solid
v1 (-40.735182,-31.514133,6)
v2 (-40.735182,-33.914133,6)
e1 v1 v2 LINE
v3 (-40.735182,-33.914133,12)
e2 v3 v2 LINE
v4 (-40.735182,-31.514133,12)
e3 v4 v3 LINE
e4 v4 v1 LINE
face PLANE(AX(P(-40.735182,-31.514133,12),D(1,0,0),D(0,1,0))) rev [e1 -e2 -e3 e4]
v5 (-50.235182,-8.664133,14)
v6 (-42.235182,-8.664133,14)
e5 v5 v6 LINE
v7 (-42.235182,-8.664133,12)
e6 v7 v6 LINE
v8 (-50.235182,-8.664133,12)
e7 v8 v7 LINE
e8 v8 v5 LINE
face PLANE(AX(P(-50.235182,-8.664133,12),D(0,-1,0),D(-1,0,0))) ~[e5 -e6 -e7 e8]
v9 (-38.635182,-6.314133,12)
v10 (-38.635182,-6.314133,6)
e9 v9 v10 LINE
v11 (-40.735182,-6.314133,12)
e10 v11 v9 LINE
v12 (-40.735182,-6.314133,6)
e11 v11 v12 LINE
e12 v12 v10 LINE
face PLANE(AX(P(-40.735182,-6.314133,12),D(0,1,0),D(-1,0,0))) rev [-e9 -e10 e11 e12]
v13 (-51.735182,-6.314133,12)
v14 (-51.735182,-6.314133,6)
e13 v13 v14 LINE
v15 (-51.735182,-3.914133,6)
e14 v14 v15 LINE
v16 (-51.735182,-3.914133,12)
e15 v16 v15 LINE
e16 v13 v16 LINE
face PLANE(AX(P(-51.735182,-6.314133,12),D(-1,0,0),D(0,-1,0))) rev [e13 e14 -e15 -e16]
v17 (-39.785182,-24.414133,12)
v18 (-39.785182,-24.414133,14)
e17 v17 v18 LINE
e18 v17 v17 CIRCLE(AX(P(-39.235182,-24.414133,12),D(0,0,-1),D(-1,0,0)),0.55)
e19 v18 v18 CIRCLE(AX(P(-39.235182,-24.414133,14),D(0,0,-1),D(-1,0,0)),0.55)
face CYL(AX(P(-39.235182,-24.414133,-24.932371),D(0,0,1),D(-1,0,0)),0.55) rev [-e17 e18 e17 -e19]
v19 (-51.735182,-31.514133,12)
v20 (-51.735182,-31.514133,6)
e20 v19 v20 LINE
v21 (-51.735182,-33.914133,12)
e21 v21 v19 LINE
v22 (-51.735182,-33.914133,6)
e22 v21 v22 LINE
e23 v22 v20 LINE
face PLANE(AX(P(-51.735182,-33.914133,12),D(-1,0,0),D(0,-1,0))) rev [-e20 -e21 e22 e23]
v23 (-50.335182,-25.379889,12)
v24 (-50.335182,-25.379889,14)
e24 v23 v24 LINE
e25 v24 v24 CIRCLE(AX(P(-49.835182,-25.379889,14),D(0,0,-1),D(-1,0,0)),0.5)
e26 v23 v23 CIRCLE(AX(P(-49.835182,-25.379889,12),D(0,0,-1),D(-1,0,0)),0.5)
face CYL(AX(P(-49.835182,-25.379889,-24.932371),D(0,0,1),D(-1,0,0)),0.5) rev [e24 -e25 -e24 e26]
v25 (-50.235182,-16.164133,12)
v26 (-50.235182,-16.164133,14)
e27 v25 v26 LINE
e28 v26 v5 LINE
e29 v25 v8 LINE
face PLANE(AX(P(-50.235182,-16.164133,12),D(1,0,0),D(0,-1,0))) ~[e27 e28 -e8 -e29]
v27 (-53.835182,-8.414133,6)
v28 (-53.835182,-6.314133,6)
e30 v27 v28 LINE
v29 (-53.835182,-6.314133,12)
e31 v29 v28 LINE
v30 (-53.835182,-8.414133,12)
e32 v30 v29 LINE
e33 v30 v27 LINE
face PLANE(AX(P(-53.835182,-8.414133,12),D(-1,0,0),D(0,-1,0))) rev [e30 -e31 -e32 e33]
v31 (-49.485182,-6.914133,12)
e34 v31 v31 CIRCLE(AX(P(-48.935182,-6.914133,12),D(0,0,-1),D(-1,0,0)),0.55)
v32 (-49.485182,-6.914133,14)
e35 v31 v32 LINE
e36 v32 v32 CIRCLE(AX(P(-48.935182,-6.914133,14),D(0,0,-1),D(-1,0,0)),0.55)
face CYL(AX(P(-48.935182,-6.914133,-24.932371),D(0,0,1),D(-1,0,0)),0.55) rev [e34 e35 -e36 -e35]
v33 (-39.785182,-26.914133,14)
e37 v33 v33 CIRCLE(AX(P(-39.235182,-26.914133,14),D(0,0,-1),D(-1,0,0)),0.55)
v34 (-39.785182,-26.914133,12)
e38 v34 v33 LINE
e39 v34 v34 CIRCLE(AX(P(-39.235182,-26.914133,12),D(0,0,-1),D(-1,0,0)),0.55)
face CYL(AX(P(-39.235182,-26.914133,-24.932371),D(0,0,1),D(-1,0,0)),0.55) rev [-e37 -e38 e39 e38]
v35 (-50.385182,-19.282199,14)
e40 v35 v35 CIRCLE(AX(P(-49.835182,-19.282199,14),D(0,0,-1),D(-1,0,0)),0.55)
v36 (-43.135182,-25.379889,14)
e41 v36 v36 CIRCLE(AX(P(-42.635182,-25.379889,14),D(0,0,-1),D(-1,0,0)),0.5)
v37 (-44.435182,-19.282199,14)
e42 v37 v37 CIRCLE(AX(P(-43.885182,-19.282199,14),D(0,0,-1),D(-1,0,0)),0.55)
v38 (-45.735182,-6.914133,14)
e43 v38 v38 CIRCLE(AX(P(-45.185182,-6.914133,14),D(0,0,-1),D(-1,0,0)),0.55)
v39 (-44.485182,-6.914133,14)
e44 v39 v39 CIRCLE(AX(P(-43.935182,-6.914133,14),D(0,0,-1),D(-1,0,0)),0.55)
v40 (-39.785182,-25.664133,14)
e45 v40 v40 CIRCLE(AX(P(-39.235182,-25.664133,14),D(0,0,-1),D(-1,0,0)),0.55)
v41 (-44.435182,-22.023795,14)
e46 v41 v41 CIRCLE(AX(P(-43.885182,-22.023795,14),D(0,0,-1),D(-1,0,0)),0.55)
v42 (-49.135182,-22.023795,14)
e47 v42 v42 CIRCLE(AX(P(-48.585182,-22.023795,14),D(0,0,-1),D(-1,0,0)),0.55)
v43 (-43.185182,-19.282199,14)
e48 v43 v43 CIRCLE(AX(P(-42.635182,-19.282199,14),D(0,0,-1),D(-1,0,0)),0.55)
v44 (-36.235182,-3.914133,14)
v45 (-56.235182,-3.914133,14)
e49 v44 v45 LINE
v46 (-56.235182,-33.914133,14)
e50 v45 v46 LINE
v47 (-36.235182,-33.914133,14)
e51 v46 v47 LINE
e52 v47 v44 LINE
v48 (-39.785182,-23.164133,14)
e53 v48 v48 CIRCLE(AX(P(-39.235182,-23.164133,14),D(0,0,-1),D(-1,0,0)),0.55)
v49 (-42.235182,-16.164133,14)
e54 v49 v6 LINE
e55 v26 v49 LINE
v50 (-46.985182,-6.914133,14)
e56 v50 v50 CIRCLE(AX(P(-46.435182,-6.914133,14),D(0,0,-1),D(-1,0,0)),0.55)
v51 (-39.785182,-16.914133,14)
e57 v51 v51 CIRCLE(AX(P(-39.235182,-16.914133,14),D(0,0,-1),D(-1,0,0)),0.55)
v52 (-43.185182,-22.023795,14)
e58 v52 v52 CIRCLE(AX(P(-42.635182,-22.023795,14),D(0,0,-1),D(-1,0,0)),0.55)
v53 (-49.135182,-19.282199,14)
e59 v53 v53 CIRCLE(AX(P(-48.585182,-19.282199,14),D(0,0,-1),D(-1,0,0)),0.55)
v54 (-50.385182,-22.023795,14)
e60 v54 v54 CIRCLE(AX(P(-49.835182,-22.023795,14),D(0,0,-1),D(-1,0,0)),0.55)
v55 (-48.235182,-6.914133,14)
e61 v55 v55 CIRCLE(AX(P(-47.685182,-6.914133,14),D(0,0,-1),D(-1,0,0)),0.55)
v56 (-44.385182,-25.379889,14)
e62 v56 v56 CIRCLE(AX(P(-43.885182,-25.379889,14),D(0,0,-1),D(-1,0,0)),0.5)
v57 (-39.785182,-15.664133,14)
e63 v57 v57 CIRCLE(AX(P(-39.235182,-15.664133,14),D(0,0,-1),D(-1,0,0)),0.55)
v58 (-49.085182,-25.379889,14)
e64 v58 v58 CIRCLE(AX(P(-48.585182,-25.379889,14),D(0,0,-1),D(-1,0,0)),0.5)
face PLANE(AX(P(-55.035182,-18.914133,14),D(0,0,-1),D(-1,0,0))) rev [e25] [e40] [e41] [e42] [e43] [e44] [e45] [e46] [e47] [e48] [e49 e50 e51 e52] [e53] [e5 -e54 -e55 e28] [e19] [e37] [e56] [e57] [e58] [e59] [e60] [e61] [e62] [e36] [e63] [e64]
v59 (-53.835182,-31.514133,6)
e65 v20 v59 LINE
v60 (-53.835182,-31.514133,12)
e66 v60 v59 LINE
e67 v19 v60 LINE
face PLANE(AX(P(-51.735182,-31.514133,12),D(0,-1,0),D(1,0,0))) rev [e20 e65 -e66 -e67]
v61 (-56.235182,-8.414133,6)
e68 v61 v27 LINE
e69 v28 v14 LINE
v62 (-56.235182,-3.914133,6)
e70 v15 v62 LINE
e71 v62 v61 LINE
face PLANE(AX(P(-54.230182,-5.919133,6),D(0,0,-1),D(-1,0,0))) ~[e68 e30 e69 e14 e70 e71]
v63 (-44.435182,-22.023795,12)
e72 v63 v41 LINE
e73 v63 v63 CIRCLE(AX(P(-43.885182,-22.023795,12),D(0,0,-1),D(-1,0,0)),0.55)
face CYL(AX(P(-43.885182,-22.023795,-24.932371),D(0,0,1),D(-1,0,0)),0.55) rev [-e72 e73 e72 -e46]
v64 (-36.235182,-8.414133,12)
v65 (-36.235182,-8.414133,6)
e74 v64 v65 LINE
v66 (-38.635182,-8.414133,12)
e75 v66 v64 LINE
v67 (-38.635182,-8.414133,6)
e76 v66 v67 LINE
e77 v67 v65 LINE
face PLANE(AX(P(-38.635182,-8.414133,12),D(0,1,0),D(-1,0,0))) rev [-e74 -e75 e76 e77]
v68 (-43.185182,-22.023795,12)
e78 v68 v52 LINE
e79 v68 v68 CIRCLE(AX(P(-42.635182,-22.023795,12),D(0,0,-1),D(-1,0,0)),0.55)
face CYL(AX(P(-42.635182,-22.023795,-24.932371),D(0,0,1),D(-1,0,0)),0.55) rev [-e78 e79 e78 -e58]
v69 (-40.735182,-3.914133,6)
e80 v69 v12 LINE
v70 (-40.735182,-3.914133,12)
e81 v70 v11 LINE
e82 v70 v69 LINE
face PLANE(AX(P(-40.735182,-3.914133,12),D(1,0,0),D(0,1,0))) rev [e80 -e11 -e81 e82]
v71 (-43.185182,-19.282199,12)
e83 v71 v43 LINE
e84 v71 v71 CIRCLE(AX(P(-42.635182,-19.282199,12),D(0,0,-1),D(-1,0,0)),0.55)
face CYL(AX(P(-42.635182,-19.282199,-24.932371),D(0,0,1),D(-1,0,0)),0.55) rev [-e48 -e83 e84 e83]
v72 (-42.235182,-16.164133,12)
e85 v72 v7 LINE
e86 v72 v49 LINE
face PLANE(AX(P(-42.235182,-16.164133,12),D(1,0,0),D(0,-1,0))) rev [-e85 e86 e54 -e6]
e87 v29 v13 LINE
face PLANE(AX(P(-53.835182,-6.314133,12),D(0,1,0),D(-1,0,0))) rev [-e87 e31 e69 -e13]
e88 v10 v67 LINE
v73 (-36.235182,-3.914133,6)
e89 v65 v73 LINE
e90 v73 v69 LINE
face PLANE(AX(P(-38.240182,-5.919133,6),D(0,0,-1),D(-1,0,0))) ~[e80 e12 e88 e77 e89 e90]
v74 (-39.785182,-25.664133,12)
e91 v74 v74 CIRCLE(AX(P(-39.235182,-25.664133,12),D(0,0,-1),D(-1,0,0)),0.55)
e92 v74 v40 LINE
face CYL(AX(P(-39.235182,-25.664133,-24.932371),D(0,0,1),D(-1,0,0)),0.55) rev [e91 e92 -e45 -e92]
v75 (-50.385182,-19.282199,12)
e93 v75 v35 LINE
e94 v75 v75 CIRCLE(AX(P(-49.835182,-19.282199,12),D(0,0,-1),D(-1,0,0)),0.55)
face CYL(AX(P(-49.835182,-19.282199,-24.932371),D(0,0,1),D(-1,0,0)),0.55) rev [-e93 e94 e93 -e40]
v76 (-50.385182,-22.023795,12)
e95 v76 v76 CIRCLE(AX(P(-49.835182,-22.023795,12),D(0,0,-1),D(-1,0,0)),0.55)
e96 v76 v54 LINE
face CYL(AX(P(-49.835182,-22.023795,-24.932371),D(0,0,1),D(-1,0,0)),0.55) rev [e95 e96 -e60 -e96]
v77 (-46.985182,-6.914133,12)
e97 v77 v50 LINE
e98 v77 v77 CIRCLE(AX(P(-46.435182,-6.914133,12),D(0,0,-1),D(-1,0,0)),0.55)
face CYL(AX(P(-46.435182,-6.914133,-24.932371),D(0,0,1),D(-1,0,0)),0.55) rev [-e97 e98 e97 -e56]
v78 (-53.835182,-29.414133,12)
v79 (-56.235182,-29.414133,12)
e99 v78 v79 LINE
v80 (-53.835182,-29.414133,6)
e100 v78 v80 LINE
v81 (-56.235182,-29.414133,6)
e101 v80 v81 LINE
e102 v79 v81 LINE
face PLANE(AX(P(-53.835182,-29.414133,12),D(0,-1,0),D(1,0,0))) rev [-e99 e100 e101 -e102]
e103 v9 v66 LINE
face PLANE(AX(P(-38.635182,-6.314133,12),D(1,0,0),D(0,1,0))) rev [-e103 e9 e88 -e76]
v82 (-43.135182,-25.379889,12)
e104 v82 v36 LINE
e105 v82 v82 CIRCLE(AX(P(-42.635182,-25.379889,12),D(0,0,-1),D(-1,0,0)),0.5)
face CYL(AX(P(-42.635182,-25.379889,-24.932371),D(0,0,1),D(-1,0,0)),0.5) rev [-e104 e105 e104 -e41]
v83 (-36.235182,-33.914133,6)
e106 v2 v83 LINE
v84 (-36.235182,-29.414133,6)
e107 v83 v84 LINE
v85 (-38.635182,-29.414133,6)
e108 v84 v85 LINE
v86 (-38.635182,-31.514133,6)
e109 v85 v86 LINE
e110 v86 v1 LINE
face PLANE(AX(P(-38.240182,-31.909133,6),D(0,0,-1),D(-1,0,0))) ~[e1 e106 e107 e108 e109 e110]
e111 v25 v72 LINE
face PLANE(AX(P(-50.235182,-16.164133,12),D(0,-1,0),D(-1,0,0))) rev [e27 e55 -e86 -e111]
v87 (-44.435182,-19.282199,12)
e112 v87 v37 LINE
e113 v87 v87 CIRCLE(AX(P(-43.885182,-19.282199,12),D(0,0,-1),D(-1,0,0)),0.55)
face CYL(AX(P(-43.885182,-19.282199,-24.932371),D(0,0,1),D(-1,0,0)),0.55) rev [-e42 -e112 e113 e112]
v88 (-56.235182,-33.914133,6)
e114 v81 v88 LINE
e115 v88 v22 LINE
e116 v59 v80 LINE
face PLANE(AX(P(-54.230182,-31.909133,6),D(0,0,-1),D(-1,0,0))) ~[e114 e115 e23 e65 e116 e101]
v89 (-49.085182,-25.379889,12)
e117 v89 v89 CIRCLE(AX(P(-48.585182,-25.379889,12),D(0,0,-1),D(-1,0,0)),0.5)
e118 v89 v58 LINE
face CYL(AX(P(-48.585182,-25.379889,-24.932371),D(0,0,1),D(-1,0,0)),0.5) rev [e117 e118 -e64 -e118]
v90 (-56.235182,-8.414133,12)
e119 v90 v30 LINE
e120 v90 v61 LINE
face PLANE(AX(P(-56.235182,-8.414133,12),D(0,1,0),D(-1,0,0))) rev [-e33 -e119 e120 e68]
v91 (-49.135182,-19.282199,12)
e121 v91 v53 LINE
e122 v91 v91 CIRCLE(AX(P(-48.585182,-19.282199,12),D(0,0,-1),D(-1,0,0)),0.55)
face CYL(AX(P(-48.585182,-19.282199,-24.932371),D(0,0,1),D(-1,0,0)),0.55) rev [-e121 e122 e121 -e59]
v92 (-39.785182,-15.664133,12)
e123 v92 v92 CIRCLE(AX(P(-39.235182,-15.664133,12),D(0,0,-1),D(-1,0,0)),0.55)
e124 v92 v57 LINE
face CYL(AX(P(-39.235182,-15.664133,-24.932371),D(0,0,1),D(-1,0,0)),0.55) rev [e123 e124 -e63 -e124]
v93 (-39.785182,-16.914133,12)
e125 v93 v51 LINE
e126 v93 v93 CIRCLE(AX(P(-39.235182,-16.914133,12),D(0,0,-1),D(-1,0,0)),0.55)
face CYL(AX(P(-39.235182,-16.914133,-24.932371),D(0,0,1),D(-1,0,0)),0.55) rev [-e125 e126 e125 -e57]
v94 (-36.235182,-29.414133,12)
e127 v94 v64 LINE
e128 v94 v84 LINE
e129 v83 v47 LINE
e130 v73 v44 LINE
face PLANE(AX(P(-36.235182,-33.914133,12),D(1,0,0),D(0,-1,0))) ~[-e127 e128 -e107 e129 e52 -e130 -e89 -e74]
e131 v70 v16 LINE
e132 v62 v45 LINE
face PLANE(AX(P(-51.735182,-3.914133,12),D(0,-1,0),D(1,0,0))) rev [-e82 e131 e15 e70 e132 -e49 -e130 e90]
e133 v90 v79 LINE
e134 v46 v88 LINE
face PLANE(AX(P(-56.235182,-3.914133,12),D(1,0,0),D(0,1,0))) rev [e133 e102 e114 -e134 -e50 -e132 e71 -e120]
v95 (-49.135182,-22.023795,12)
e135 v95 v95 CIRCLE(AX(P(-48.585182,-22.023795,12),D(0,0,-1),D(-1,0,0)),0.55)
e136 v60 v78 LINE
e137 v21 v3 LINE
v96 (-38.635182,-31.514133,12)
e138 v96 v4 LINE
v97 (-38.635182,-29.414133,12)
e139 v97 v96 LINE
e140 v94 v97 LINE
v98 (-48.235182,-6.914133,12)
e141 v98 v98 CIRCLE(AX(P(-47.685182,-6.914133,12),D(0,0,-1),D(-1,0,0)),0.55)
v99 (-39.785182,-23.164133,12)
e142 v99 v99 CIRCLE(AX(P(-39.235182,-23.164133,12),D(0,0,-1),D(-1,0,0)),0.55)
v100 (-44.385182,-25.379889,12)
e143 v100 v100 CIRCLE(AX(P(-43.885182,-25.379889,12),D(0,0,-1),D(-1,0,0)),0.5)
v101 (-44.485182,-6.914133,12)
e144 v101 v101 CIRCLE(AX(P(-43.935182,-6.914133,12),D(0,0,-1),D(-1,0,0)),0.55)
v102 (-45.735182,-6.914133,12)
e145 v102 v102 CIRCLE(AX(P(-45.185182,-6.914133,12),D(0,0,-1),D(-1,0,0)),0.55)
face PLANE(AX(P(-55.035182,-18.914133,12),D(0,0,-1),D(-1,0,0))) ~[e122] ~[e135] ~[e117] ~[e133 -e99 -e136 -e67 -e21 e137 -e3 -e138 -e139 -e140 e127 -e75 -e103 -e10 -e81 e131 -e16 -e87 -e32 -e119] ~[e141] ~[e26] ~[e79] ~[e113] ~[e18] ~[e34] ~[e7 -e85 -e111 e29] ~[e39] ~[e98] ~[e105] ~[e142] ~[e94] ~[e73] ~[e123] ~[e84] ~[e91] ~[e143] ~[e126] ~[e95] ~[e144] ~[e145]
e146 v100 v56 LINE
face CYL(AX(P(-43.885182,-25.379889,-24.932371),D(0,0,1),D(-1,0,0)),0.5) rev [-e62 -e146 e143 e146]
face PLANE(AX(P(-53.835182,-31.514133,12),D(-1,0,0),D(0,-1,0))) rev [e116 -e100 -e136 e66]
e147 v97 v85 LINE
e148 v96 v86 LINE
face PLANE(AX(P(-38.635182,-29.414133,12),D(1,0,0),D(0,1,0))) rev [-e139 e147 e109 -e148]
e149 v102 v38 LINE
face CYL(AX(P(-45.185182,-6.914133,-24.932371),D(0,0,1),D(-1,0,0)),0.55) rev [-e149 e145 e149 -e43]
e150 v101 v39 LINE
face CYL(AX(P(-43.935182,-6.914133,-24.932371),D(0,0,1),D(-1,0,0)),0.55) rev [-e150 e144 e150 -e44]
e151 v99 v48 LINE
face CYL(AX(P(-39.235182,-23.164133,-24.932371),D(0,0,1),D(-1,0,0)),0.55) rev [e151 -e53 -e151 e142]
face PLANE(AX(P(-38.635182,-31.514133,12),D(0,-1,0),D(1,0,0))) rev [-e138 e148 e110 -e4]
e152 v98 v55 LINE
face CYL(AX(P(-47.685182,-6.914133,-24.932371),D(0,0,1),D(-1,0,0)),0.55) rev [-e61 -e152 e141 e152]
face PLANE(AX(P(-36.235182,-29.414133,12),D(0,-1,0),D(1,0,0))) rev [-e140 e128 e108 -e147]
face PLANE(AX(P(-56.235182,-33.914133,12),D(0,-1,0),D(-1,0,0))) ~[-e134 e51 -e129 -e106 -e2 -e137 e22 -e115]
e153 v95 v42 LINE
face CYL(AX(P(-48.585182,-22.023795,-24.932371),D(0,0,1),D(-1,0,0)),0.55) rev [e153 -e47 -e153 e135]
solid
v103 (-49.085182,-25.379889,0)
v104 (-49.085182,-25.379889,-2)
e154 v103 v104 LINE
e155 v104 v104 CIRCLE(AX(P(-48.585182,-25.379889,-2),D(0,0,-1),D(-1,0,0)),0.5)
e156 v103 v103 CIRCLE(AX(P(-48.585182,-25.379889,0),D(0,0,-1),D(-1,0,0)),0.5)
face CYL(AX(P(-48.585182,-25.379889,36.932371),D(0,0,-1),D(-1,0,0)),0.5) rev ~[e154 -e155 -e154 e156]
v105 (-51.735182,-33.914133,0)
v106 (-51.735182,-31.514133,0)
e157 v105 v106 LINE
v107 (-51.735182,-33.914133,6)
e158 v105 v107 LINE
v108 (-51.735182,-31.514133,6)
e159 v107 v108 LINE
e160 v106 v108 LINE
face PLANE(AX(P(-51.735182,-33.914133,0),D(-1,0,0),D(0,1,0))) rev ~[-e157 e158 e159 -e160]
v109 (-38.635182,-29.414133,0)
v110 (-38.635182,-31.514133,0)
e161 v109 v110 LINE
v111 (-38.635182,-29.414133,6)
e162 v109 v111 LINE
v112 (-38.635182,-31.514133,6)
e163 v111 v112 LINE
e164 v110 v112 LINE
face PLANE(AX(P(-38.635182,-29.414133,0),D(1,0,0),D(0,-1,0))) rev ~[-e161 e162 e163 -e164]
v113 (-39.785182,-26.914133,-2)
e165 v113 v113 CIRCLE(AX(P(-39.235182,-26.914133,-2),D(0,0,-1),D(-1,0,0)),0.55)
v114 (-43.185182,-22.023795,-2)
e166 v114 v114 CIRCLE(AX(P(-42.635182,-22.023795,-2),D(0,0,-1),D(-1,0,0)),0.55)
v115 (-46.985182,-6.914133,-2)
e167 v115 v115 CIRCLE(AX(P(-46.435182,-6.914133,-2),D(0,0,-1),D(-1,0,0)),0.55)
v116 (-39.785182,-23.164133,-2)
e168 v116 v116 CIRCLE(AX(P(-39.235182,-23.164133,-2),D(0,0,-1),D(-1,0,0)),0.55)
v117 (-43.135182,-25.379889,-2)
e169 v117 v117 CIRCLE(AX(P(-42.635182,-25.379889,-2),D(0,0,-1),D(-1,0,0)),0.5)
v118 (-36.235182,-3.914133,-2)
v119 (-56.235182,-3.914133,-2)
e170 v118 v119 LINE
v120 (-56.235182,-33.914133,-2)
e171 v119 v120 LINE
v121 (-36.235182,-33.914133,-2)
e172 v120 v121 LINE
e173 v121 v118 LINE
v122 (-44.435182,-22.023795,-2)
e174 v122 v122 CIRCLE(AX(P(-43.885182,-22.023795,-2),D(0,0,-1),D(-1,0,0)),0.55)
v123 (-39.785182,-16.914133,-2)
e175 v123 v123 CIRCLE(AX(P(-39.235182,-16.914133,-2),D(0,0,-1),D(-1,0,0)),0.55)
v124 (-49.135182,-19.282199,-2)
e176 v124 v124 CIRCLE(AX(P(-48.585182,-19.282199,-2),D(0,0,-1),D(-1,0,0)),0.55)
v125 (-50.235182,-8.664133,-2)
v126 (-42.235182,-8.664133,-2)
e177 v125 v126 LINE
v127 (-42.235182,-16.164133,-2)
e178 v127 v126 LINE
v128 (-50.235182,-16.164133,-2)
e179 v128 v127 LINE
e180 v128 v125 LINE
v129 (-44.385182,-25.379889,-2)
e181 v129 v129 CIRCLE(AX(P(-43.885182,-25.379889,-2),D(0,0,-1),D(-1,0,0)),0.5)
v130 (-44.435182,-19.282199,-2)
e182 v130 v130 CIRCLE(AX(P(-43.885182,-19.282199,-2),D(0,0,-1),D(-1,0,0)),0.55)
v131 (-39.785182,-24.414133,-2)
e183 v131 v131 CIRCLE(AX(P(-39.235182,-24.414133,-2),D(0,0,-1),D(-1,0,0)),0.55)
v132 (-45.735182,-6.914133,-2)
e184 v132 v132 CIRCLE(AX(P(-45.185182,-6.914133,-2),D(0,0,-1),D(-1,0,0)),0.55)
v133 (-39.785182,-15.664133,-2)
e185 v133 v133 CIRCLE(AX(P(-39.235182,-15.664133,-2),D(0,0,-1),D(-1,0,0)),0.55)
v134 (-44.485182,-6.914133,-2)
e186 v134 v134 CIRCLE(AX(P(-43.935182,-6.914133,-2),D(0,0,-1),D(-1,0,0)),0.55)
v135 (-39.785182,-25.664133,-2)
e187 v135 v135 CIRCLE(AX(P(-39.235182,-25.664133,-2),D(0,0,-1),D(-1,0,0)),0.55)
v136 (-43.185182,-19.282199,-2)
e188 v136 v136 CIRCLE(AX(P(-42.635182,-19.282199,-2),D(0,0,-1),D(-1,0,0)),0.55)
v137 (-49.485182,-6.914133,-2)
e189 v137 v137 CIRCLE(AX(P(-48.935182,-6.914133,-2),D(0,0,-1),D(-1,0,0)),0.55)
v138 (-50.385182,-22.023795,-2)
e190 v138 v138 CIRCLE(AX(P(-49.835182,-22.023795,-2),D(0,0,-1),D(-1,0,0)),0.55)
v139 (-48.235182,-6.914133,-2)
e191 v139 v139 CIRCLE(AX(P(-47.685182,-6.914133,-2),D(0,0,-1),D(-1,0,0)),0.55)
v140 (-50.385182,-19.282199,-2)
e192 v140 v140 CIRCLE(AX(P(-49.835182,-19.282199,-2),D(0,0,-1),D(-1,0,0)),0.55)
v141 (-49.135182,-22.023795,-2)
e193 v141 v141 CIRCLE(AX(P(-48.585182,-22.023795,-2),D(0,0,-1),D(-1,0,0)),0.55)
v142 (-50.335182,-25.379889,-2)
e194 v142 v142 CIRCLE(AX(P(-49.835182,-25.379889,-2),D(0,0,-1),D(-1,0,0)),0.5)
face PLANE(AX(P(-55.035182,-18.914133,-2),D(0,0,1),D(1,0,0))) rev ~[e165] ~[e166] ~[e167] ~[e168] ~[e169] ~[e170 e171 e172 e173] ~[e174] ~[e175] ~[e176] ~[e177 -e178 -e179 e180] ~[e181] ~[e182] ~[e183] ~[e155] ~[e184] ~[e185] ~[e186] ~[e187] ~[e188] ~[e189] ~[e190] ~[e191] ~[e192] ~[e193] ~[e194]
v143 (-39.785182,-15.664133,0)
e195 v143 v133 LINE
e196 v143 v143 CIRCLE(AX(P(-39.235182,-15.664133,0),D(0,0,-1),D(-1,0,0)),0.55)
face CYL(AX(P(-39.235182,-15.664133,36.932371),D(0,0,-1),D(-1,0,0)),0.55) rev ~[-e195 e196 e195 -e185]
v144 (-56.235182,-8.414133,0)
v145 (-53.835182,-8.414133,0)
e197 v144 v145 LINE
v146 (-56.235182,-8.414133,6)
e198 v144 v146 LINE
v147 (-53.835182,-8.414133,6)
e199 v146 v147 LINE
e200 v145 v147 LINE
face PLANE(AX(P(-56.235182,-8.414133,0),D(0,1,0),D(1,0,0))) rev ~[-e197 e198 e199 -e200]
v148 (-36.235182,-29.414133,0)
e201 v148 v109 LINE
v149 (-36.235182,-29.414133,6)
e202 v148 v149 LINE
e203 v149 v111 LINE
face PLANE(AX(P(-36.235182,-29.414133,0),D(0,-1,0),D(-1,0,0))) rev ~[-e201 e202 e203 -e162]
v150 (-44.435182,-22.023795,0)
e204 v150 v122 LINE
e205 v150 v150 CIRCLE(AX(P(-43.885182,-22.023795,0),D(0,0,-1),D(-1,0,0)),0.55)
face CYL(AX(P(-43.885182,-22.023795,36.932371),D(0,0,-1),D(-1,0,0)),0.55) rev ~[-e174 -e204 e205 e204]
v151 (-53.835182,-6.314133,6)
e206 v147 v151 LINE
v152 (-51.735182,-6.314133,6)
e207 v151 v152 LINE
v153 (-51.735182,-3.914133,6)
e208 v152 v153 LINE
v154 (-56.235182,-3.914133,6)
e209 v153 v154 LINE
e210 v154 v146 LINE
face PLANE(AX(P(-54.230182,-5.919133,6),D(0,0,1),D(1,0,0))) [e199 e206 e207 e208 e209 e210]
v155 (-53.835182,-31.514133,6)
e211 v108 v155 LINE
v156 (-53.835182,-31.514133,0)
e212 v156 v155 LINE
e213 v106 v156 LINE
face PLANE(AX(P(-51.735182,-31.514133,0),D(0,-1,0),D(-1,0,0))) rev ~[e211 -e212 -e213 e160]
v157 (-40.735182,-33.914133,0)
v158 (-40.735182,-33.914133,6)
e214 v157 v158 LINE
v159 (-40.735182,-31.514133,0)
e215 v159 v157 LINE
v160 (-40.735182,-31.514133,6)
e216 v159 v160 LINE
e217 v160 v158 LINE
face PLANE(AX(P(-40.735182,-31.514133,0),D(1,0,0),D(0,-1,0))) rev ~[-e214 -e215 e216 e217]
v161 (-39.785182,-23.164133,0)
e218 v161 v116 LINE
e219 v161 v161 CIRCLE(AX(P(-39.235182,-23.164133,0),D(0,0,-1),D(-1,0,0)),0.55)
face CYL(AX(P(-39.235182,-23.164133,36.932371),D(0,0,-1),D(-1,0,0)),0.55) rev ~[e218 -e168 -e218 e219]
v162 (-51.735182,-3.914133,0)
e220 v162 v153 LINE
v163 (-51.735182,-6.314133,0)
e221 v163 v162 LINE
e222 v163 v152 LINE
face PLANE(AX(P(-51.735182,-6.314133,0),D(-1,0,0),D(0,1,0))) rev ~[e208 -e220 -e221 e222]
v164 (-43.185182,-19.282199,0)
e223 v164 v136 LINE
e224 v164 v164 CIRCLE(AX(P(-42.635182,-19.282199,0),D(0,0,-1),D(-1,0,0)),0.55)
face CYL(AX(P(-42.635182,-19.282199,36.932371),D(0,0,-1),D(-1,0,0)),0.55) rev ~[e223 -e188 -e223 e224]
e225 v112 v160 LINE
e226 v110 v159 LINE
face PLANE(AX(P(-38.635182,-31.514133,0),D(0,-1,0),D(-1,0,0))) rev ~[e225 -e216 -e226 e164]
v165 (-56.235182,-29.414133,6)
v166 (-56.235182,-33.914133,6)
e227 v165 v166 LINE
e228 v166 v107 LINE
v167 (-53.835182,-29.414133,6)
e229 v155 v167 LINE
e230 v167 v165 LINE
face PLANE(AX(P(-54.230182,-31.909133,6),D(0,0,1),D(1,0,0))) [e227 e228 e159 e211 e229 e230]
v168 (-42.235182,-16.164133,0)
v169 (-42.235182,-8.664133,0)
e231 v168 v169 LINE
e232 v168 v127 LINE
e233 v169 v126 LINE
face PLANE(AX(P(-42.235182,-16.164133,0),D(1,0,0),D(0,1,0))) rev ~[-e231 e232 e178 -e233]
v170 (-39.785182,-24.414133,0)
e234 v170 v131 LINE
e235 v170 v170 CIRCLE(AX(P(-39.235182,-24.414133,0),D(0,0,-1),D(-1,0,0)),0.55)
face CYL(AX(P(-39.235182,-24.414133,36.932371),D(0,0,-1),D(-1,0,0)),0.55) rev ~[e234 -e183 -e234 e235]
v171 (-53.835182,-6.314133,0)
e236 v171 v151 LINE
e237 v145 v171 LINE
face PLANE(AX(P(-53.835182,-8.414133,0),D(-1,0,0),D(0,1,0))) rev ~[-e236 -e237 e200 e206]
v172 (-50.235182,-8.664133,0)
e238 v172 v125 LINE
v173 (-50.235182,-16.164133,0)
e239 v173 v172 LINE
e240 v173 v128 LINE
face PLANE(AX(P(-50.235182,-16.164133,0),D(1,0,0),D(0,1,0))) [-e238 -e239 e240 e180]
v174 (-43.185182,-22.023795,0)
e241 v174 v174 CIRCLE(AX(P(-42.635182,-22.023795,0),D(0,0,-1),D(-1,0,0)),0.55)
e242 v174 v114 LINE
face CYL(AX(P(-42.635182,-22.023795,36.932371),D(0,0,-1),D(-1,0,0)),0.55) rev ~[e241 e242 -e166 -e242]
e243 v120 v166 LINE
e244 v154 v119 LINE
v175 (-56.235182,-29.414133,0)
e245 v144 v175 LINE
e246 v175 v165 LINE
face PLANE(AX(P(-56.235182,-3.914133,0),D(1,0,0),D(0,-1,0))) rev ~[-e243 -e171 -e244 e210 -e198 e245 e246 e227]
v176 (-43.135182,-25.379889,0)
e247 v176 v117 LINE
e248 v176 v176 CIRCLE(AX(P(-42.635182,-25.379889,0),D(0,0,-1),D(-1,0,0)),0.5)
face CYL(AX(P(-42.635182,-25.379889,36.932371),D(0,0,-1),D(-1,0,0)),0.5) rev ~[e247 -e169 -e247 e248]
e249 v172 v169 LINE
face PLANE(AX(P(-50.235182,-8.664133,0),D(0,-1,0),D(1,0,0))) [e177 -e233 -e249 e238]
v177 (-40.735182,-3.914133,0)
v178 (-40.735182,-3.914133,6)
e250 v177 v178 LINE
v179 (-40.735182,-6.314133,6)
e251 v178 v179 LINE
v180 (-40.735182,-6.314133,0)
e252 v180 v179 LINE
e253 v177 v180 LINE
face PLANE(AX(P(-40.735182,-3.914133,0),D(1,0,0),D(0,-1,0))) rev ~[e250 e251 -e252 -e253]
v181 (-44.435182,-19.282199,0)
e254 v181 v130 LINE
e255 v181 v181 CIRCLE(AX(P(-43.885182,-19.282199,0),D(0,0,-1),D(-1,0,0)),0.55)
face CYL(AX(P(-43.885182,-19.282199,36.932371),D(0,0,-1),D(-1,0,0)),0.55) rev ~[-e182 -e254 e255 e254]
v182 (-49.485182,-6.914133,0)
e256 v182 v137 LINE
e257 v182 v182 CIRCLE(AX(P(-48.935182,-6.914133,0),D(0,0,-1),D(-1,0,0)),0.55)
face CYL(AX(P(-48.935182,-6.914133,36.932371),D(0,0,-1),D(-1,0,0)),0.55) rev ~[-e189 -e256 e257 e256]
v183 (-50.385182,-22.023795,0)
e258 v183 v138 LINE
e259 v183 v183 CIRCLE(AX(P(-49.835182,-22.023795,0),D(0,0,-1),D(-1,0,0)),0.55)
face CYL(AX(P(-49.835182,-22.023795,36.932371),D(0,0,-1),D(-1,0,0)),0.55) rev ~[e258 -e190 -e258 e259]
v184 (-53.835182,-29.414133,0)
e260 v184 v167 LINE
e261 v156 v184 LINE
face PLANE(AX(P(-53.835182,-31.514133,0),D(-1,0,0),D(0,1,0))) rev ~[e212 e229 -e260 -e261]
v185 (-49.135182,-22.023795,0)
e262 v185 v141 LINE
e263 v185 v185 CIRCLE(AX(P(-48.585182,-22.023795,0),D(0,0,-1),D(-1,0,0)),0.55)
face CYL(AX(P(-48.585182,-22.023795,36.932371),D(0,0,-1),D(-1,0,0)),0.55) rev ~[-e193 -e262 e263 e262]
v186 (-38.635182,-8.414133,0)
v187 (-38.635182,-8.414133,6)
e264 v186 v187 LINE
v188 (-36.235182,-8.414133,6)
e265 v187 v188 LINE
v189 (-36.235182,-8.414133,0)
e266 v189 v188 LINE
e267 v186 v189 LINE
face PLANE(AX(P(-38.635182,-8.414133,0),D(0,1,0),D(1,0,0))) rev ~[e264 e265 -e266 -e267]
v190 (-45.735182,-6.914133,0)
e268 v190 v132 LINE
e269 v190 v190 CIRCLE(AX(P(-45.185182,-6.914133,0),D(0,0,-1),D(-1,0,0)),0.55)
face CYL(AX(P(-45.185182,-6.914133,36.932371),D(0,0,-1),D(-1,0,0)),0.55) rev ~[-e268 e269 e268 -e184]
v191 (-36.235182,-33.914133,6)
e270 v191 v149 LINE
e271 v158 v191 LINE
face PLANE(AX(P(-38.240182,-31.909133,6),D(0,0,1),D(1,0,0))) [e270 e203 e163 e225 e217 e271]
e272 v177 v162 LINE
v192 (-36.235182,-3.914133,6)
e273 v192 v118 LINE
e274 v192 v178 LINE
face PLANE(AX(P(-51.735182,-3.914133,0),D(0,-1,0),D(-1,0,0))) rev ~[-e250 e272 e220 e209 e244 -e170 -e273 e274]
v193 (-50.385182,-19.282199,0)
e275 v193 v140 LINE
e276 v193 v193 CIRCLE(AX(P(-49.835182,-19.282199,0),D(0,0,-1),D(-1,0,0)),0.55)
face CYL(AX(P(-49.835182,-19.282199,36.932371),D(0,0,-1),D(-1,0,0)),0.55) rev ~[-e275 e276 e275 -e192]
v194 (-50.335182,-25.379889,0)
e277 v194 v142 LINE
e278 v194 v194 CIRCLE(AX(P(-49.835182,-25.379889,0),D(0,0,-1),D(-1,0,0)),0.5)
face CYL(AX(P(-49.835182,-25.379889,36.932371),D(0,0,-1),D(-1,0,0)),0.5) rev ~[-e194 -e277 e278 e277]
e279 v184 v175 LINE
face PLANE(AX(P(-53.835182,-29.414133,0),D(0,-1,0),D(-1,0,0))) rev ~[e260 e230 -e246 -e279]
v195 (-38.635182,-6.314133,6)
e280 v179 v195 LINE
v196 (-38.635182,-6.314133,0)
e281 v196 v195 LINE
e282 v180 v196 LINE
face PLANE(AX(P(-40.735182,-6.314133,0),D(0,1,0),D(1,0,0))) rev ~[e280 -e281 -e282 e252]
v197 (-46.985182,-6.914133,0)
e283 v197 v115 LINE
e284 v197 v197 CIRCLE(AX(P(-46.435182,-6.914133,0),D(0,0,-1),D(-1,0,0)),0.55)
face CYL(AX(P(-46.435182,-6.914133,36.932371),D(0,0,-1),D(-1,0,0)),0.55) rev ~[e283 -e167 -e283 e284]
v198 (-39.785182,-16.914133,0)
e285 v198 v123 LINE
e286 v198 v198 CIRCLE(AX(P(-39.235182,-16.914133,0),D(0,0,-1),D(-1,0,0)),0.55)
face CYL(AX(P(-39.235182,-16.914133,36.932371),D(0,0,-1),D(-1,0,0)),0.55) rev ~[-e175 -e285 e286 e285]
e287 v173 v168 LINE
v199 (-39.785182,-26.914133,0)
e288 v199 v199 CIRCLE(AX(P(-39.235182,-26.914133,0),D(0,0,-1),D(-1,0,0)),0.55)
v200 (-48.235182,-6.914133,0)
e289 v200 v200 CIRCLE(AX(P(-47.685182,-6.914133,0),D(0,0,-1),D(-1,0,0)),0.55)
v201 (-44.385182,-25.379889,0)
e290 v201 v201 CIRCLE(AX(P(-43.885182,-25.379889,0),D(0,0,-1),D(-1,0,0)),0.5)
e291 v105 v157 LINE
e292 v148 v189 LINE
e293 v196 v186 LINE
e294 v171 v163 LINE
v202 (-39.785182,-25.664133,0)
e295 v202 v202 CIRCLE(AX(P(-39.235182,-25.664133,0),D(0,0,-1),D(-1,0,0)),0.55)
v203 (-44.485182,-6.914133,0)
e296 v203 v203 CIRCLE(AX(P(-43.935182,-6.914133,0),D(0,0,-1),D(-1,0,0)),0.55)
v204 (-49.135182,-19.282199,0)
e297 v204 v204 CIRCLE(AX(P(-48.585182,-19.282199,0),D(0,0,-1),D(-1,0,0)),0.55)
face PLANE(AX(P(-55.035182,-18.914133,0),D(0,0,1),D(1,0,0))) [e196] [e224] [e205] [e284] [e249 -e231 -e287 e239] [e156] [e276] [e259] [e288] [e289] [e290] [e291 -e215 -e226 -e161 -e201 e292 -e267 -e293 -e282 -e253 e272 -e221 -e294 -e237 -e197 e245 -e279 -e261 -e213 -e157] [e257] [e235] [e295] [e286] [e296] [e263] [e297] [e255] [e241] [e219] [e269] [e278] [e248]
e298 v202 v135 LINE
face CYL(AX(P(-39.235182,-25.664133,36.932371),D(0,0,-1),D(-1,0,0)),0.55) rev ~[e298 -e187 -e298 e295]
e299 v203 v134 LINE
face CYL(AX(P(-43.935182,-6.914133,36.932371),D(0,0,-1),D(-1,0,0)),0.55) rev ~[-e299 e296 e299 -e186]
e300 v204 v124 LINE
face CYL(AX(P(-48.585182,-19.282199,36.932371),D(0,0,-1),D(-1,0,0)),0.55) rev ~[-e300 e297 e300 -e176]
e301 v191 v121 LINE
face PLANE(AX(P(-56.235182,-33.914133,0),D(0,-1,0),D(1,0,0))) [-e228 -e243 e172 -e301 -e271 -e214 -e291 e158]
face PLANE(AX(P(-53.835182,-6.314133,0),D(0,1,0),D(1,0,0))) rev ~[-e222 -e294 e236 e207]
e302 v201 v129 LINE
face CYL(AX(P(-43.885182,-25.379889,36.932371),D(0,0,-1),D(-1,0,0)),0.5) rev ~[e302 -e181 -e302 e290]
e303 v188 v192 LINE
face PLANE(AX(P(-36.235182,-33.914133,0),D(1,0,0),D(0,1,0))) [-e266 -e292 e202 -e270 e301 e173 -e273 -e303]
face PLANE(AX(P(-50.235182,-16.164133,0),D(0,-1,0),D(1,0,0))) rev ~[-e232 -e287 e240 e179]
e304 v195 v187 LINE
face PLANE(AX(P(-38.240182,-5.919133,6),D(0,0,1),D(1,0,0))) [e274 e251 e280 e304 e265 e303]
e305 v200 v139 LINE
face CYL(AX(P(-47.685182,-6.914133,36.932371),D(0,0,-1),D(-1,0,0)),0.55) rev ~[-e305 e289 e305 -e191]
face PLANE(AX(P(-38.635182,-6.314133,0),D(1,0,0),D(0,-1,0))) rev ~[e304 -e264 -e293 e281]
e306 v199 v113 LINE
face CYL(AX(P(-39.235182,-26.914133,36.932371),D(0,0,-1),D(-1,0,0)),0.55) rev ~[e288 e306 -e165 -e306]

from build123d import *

# Parameters (mm, degrees)
F0_W     = 2.4
F0_H     = 21
F0_W_2   = 11
F0_H_2   = 2.4
F0_W_3   = 8
F0_H_3   = 7.5
F1_DEPTH = 2
F2_DEPTH = 6
F3_D     = 1.1
F4_D     = 1.1
F5_D     = 1


# Not quite as in the source:
# - a feature names something its author has since deleted; it is built from what else it names


with BuildPart() as f1:
    # F0 (on Top) → F1 (new body)
    with BuildSketch(Plane.XY):
        with Locations((-55.0351821041, -18.9141327012)):
            Rectangle(F0_W, F0_H)
        with Locations((-46.2351821041, -32.7141327012)):
            Rectangle(F0_W_2, F0_H_2)
        Polygon((-51.7351821041, -33.9141327012), (-51.7351821041, -31.5141327012), (-53.8351821041, -31.5141327012), (-53.8351821041, -29.4141327012), (-56.2351821041, -29.4141327012), (-56.2351821041, -33.9141327012), align=None)
        Polygon((-38.6351821041, -29.4141327012), (-38.6351821041, -31.5141327012), (-40.7351821041, -31.5141327012), (-40.7351821041, -33.9141327012), (-36.2351821041, -33.9141327012), (-36.2351821041, -29.4141327012), align=None)
        Polygon((-38.6351821041, -26.1641327012), (-38.6351821041, -29.4141327012), (-36.2351821041, -29.4141327012), (-36.2351821041, -8.4141327012), (-38.6351821041, -8.4141327012), (-38.6351821041, -15.1641327012), (-38.6351821041, -16.1641327012), (-38.6351821041, -16.4141327012), (-38.6351821041, -17.4141327012), (-38.6351821041, -22.6641327012), (-38.6351821041, -23.6641327012), (-38.6351821041, -23.9141327012), (-38.6351821041, -24.9141327012), (-38.6351821041, -25.1641327012), align=None)
        Polygon((-38.6351821041, -8.4141327012), (-36.2351821041, -8.4141327012), (-36.2351821041, -3.9141327012), (-40.7351821041, -3.9141327012), (-40.7351821041, -6.3141327012), (-38.6351821041, -6.3141327012), align=None)
        Polygon((-40.7351821041, -6.3141327012), (-40.7351821041, -3.9141327012), (-51.7351821041, -3.9141327012), (-51.7351821041, -6.3141327012), (-49.4351821041, -6.3141327012), (-48.4351821041, -6.3141327012), (-48.1851821041, -6.3141327012), (-47.1851821041, -6.3141327012), (-46.9351821041, -6.3141327012), (-45.9351821041, -6.3141327012), (-45.6851821041, -6.3141327012), (-44.6851821041, -6.3141327012), (-44.4351821041, -6.3141327012), (-43.4351821041, -6.3141327012), align=None)
        Polygon((-56.2351821041, -8.4141327012), (-53.8351821041, -8.4141327012), (-53.8351821041, -6.3141327012), (-51.7351821041, -6.3141327012), (-51.7351821041, -3.9141327012), (-56.2351821041, -3.9141327012), align=None)
        Polygon((-40.7351821041, -31.5141327012), (-38.6351821041, -31.5141327012), (-38.6351821041, -29.4141327012), (-38.6351821041, -26.1641327012), (-38.6351821041, -25.1641327012), (-38.6351821041, -24.9141327012), (-38.6351821041, -23.9141327012), (-38.6351821041, -23.6641327012), (-38.6351821041, -22.6641327012), (-38.6351821041, -17.4141327012), (-38.6351821041, -16.4141327012), (-38.6351821041, -16.1641327012), (-38.6351821041, -15.1641327012), (-38.6351821041, -8.4141327012), (-38.6351821041, -6.3141327012), (-40.7351821041, -6.3141327012), (-43.4351821041, -6.3141327012), (-44.4351821041, -6.3141327012), (-44.6851821041, -6.3141327012), (-45.6851821041, -6.3141327012), (-45.9351821041, -6.3141327012), (-46.9351821041, -6.3141327012), (-47.1851821041, -6.3141327012), (-48.1851821041, -6.3141327012), (-48.4351821041, -6.3141327012), (-49.4351821041, -6.3141327012), (-51.7351821041, -6.3141327012), (-53.8351821041, -6.3141327012), (-53.8351821041, -8.4141327012), (-53.8351821041, -29.4141327012), (-53.8351821041, -31.5141327012), (-51.7351821041, -31.5141327012), align=None)
        with Locations((-46.2351821041, -12.4141327012)):
            Rectangle(F0_W_3, F0_H_3, mode=Mode.SUBTRACT)
    extrude(amount=-F1_DEPTH)

    # F0 (on Top) → F2 (join)
    with BuildSketch(Plane.XY):
        Polygon((-56.2351821041, -8.4141327012), (-53.8351821041, -8.4141327012), (-53.8351821041, -6.3141327012), (-51.7351821041, -6.3141327012), (-51.7351821041, -3.9141327012), (-56.2351821041, -3.9141327012), align=None)
        Polygon((-38.6351821041, -8.4141327012), (-36.2351821041, -8.4141327012), (-36.2351821041, -3.9141327012), (-40.7351821041, -3.9141327012), (-40.7351821041, -6.3141327012), (-38.6351821041, -6.3141327012), align=None)
        Polygon((-38.6351821041, -29.4141327012), (-38.6351821041, -31.5141327012), (-40.7351821041, -31.5141327012), (-40.7351821041, -33.9141327012), (-36.2351821041, -33.9141327012), (-36.2351821041, -29.4141327012), align=None)
        Polygon((-51.7351821041, -33.9141327012), (-51.7351821041, -31.5141327012), (-53.8351821041, -31.5141327012), (-53.8351821041, -29.4141327012), (-56.2351821041, -29.4141327012), (-56.2351821041, -33.9141327012), align=None)
    extrude(amount=F2_DEPTH)

    # F3 (through all)
    with Locations(Plane.XY):
        with Locations((-39.2351821041, -24.4141327012), (-39.2351821041, -23.1641327012), (-39.2351821041, -16.9141327012), (-39.2351821041, -15.6641327012), (-43.9351821041, -6.9141327012), (-45.1851821041, -6.9141327012), (-46.4351821041, -6.9141327012), (-47.6851821041, -6.9141327012), (-48.9351821041, -6.9141327012), (-39.2351821041, -25.6641327012), (-39.2351821041, -26.9141327012)):
            Hole(F3_D / 2)

    # F4 (through all)
    with Locations(Plane.XY):
        with Locations((-49.8351821041, -19.2821994424), (-48.5851821041, -19.2821994424), (-43.8851821041, -19.2821994424), (-42.6351821041, -19.2821994424), (-49.8351821041, -22.0237951726), (-48.5851821041, -22.0237951726), (-43.8851821041, -22.0237951726), (-42.6351821041, -22.0237951726)):
            Hole(F4_D / 2)

    # F5 (through all)
    with Locations(Plane.XY):
        with Locations((-49.8351821041, -25.3798887134), (-48.5851821041, -25.3798887134), (-43.8851821041, -25.3798887134), (-42.6351821041, -25.3798887134)):
            Hole(F5_D / 2)


with BuildPart() as f6_1:
    # F6: instance of F1
    add(f1.part.mirror(Plane(origin=(-54.3192730132, -31.9982236102, 6), x_dir=(1, 0, 0), z_dir=(0, 0, 1))))


solid = Compound([f1.part, f6_1.part])
